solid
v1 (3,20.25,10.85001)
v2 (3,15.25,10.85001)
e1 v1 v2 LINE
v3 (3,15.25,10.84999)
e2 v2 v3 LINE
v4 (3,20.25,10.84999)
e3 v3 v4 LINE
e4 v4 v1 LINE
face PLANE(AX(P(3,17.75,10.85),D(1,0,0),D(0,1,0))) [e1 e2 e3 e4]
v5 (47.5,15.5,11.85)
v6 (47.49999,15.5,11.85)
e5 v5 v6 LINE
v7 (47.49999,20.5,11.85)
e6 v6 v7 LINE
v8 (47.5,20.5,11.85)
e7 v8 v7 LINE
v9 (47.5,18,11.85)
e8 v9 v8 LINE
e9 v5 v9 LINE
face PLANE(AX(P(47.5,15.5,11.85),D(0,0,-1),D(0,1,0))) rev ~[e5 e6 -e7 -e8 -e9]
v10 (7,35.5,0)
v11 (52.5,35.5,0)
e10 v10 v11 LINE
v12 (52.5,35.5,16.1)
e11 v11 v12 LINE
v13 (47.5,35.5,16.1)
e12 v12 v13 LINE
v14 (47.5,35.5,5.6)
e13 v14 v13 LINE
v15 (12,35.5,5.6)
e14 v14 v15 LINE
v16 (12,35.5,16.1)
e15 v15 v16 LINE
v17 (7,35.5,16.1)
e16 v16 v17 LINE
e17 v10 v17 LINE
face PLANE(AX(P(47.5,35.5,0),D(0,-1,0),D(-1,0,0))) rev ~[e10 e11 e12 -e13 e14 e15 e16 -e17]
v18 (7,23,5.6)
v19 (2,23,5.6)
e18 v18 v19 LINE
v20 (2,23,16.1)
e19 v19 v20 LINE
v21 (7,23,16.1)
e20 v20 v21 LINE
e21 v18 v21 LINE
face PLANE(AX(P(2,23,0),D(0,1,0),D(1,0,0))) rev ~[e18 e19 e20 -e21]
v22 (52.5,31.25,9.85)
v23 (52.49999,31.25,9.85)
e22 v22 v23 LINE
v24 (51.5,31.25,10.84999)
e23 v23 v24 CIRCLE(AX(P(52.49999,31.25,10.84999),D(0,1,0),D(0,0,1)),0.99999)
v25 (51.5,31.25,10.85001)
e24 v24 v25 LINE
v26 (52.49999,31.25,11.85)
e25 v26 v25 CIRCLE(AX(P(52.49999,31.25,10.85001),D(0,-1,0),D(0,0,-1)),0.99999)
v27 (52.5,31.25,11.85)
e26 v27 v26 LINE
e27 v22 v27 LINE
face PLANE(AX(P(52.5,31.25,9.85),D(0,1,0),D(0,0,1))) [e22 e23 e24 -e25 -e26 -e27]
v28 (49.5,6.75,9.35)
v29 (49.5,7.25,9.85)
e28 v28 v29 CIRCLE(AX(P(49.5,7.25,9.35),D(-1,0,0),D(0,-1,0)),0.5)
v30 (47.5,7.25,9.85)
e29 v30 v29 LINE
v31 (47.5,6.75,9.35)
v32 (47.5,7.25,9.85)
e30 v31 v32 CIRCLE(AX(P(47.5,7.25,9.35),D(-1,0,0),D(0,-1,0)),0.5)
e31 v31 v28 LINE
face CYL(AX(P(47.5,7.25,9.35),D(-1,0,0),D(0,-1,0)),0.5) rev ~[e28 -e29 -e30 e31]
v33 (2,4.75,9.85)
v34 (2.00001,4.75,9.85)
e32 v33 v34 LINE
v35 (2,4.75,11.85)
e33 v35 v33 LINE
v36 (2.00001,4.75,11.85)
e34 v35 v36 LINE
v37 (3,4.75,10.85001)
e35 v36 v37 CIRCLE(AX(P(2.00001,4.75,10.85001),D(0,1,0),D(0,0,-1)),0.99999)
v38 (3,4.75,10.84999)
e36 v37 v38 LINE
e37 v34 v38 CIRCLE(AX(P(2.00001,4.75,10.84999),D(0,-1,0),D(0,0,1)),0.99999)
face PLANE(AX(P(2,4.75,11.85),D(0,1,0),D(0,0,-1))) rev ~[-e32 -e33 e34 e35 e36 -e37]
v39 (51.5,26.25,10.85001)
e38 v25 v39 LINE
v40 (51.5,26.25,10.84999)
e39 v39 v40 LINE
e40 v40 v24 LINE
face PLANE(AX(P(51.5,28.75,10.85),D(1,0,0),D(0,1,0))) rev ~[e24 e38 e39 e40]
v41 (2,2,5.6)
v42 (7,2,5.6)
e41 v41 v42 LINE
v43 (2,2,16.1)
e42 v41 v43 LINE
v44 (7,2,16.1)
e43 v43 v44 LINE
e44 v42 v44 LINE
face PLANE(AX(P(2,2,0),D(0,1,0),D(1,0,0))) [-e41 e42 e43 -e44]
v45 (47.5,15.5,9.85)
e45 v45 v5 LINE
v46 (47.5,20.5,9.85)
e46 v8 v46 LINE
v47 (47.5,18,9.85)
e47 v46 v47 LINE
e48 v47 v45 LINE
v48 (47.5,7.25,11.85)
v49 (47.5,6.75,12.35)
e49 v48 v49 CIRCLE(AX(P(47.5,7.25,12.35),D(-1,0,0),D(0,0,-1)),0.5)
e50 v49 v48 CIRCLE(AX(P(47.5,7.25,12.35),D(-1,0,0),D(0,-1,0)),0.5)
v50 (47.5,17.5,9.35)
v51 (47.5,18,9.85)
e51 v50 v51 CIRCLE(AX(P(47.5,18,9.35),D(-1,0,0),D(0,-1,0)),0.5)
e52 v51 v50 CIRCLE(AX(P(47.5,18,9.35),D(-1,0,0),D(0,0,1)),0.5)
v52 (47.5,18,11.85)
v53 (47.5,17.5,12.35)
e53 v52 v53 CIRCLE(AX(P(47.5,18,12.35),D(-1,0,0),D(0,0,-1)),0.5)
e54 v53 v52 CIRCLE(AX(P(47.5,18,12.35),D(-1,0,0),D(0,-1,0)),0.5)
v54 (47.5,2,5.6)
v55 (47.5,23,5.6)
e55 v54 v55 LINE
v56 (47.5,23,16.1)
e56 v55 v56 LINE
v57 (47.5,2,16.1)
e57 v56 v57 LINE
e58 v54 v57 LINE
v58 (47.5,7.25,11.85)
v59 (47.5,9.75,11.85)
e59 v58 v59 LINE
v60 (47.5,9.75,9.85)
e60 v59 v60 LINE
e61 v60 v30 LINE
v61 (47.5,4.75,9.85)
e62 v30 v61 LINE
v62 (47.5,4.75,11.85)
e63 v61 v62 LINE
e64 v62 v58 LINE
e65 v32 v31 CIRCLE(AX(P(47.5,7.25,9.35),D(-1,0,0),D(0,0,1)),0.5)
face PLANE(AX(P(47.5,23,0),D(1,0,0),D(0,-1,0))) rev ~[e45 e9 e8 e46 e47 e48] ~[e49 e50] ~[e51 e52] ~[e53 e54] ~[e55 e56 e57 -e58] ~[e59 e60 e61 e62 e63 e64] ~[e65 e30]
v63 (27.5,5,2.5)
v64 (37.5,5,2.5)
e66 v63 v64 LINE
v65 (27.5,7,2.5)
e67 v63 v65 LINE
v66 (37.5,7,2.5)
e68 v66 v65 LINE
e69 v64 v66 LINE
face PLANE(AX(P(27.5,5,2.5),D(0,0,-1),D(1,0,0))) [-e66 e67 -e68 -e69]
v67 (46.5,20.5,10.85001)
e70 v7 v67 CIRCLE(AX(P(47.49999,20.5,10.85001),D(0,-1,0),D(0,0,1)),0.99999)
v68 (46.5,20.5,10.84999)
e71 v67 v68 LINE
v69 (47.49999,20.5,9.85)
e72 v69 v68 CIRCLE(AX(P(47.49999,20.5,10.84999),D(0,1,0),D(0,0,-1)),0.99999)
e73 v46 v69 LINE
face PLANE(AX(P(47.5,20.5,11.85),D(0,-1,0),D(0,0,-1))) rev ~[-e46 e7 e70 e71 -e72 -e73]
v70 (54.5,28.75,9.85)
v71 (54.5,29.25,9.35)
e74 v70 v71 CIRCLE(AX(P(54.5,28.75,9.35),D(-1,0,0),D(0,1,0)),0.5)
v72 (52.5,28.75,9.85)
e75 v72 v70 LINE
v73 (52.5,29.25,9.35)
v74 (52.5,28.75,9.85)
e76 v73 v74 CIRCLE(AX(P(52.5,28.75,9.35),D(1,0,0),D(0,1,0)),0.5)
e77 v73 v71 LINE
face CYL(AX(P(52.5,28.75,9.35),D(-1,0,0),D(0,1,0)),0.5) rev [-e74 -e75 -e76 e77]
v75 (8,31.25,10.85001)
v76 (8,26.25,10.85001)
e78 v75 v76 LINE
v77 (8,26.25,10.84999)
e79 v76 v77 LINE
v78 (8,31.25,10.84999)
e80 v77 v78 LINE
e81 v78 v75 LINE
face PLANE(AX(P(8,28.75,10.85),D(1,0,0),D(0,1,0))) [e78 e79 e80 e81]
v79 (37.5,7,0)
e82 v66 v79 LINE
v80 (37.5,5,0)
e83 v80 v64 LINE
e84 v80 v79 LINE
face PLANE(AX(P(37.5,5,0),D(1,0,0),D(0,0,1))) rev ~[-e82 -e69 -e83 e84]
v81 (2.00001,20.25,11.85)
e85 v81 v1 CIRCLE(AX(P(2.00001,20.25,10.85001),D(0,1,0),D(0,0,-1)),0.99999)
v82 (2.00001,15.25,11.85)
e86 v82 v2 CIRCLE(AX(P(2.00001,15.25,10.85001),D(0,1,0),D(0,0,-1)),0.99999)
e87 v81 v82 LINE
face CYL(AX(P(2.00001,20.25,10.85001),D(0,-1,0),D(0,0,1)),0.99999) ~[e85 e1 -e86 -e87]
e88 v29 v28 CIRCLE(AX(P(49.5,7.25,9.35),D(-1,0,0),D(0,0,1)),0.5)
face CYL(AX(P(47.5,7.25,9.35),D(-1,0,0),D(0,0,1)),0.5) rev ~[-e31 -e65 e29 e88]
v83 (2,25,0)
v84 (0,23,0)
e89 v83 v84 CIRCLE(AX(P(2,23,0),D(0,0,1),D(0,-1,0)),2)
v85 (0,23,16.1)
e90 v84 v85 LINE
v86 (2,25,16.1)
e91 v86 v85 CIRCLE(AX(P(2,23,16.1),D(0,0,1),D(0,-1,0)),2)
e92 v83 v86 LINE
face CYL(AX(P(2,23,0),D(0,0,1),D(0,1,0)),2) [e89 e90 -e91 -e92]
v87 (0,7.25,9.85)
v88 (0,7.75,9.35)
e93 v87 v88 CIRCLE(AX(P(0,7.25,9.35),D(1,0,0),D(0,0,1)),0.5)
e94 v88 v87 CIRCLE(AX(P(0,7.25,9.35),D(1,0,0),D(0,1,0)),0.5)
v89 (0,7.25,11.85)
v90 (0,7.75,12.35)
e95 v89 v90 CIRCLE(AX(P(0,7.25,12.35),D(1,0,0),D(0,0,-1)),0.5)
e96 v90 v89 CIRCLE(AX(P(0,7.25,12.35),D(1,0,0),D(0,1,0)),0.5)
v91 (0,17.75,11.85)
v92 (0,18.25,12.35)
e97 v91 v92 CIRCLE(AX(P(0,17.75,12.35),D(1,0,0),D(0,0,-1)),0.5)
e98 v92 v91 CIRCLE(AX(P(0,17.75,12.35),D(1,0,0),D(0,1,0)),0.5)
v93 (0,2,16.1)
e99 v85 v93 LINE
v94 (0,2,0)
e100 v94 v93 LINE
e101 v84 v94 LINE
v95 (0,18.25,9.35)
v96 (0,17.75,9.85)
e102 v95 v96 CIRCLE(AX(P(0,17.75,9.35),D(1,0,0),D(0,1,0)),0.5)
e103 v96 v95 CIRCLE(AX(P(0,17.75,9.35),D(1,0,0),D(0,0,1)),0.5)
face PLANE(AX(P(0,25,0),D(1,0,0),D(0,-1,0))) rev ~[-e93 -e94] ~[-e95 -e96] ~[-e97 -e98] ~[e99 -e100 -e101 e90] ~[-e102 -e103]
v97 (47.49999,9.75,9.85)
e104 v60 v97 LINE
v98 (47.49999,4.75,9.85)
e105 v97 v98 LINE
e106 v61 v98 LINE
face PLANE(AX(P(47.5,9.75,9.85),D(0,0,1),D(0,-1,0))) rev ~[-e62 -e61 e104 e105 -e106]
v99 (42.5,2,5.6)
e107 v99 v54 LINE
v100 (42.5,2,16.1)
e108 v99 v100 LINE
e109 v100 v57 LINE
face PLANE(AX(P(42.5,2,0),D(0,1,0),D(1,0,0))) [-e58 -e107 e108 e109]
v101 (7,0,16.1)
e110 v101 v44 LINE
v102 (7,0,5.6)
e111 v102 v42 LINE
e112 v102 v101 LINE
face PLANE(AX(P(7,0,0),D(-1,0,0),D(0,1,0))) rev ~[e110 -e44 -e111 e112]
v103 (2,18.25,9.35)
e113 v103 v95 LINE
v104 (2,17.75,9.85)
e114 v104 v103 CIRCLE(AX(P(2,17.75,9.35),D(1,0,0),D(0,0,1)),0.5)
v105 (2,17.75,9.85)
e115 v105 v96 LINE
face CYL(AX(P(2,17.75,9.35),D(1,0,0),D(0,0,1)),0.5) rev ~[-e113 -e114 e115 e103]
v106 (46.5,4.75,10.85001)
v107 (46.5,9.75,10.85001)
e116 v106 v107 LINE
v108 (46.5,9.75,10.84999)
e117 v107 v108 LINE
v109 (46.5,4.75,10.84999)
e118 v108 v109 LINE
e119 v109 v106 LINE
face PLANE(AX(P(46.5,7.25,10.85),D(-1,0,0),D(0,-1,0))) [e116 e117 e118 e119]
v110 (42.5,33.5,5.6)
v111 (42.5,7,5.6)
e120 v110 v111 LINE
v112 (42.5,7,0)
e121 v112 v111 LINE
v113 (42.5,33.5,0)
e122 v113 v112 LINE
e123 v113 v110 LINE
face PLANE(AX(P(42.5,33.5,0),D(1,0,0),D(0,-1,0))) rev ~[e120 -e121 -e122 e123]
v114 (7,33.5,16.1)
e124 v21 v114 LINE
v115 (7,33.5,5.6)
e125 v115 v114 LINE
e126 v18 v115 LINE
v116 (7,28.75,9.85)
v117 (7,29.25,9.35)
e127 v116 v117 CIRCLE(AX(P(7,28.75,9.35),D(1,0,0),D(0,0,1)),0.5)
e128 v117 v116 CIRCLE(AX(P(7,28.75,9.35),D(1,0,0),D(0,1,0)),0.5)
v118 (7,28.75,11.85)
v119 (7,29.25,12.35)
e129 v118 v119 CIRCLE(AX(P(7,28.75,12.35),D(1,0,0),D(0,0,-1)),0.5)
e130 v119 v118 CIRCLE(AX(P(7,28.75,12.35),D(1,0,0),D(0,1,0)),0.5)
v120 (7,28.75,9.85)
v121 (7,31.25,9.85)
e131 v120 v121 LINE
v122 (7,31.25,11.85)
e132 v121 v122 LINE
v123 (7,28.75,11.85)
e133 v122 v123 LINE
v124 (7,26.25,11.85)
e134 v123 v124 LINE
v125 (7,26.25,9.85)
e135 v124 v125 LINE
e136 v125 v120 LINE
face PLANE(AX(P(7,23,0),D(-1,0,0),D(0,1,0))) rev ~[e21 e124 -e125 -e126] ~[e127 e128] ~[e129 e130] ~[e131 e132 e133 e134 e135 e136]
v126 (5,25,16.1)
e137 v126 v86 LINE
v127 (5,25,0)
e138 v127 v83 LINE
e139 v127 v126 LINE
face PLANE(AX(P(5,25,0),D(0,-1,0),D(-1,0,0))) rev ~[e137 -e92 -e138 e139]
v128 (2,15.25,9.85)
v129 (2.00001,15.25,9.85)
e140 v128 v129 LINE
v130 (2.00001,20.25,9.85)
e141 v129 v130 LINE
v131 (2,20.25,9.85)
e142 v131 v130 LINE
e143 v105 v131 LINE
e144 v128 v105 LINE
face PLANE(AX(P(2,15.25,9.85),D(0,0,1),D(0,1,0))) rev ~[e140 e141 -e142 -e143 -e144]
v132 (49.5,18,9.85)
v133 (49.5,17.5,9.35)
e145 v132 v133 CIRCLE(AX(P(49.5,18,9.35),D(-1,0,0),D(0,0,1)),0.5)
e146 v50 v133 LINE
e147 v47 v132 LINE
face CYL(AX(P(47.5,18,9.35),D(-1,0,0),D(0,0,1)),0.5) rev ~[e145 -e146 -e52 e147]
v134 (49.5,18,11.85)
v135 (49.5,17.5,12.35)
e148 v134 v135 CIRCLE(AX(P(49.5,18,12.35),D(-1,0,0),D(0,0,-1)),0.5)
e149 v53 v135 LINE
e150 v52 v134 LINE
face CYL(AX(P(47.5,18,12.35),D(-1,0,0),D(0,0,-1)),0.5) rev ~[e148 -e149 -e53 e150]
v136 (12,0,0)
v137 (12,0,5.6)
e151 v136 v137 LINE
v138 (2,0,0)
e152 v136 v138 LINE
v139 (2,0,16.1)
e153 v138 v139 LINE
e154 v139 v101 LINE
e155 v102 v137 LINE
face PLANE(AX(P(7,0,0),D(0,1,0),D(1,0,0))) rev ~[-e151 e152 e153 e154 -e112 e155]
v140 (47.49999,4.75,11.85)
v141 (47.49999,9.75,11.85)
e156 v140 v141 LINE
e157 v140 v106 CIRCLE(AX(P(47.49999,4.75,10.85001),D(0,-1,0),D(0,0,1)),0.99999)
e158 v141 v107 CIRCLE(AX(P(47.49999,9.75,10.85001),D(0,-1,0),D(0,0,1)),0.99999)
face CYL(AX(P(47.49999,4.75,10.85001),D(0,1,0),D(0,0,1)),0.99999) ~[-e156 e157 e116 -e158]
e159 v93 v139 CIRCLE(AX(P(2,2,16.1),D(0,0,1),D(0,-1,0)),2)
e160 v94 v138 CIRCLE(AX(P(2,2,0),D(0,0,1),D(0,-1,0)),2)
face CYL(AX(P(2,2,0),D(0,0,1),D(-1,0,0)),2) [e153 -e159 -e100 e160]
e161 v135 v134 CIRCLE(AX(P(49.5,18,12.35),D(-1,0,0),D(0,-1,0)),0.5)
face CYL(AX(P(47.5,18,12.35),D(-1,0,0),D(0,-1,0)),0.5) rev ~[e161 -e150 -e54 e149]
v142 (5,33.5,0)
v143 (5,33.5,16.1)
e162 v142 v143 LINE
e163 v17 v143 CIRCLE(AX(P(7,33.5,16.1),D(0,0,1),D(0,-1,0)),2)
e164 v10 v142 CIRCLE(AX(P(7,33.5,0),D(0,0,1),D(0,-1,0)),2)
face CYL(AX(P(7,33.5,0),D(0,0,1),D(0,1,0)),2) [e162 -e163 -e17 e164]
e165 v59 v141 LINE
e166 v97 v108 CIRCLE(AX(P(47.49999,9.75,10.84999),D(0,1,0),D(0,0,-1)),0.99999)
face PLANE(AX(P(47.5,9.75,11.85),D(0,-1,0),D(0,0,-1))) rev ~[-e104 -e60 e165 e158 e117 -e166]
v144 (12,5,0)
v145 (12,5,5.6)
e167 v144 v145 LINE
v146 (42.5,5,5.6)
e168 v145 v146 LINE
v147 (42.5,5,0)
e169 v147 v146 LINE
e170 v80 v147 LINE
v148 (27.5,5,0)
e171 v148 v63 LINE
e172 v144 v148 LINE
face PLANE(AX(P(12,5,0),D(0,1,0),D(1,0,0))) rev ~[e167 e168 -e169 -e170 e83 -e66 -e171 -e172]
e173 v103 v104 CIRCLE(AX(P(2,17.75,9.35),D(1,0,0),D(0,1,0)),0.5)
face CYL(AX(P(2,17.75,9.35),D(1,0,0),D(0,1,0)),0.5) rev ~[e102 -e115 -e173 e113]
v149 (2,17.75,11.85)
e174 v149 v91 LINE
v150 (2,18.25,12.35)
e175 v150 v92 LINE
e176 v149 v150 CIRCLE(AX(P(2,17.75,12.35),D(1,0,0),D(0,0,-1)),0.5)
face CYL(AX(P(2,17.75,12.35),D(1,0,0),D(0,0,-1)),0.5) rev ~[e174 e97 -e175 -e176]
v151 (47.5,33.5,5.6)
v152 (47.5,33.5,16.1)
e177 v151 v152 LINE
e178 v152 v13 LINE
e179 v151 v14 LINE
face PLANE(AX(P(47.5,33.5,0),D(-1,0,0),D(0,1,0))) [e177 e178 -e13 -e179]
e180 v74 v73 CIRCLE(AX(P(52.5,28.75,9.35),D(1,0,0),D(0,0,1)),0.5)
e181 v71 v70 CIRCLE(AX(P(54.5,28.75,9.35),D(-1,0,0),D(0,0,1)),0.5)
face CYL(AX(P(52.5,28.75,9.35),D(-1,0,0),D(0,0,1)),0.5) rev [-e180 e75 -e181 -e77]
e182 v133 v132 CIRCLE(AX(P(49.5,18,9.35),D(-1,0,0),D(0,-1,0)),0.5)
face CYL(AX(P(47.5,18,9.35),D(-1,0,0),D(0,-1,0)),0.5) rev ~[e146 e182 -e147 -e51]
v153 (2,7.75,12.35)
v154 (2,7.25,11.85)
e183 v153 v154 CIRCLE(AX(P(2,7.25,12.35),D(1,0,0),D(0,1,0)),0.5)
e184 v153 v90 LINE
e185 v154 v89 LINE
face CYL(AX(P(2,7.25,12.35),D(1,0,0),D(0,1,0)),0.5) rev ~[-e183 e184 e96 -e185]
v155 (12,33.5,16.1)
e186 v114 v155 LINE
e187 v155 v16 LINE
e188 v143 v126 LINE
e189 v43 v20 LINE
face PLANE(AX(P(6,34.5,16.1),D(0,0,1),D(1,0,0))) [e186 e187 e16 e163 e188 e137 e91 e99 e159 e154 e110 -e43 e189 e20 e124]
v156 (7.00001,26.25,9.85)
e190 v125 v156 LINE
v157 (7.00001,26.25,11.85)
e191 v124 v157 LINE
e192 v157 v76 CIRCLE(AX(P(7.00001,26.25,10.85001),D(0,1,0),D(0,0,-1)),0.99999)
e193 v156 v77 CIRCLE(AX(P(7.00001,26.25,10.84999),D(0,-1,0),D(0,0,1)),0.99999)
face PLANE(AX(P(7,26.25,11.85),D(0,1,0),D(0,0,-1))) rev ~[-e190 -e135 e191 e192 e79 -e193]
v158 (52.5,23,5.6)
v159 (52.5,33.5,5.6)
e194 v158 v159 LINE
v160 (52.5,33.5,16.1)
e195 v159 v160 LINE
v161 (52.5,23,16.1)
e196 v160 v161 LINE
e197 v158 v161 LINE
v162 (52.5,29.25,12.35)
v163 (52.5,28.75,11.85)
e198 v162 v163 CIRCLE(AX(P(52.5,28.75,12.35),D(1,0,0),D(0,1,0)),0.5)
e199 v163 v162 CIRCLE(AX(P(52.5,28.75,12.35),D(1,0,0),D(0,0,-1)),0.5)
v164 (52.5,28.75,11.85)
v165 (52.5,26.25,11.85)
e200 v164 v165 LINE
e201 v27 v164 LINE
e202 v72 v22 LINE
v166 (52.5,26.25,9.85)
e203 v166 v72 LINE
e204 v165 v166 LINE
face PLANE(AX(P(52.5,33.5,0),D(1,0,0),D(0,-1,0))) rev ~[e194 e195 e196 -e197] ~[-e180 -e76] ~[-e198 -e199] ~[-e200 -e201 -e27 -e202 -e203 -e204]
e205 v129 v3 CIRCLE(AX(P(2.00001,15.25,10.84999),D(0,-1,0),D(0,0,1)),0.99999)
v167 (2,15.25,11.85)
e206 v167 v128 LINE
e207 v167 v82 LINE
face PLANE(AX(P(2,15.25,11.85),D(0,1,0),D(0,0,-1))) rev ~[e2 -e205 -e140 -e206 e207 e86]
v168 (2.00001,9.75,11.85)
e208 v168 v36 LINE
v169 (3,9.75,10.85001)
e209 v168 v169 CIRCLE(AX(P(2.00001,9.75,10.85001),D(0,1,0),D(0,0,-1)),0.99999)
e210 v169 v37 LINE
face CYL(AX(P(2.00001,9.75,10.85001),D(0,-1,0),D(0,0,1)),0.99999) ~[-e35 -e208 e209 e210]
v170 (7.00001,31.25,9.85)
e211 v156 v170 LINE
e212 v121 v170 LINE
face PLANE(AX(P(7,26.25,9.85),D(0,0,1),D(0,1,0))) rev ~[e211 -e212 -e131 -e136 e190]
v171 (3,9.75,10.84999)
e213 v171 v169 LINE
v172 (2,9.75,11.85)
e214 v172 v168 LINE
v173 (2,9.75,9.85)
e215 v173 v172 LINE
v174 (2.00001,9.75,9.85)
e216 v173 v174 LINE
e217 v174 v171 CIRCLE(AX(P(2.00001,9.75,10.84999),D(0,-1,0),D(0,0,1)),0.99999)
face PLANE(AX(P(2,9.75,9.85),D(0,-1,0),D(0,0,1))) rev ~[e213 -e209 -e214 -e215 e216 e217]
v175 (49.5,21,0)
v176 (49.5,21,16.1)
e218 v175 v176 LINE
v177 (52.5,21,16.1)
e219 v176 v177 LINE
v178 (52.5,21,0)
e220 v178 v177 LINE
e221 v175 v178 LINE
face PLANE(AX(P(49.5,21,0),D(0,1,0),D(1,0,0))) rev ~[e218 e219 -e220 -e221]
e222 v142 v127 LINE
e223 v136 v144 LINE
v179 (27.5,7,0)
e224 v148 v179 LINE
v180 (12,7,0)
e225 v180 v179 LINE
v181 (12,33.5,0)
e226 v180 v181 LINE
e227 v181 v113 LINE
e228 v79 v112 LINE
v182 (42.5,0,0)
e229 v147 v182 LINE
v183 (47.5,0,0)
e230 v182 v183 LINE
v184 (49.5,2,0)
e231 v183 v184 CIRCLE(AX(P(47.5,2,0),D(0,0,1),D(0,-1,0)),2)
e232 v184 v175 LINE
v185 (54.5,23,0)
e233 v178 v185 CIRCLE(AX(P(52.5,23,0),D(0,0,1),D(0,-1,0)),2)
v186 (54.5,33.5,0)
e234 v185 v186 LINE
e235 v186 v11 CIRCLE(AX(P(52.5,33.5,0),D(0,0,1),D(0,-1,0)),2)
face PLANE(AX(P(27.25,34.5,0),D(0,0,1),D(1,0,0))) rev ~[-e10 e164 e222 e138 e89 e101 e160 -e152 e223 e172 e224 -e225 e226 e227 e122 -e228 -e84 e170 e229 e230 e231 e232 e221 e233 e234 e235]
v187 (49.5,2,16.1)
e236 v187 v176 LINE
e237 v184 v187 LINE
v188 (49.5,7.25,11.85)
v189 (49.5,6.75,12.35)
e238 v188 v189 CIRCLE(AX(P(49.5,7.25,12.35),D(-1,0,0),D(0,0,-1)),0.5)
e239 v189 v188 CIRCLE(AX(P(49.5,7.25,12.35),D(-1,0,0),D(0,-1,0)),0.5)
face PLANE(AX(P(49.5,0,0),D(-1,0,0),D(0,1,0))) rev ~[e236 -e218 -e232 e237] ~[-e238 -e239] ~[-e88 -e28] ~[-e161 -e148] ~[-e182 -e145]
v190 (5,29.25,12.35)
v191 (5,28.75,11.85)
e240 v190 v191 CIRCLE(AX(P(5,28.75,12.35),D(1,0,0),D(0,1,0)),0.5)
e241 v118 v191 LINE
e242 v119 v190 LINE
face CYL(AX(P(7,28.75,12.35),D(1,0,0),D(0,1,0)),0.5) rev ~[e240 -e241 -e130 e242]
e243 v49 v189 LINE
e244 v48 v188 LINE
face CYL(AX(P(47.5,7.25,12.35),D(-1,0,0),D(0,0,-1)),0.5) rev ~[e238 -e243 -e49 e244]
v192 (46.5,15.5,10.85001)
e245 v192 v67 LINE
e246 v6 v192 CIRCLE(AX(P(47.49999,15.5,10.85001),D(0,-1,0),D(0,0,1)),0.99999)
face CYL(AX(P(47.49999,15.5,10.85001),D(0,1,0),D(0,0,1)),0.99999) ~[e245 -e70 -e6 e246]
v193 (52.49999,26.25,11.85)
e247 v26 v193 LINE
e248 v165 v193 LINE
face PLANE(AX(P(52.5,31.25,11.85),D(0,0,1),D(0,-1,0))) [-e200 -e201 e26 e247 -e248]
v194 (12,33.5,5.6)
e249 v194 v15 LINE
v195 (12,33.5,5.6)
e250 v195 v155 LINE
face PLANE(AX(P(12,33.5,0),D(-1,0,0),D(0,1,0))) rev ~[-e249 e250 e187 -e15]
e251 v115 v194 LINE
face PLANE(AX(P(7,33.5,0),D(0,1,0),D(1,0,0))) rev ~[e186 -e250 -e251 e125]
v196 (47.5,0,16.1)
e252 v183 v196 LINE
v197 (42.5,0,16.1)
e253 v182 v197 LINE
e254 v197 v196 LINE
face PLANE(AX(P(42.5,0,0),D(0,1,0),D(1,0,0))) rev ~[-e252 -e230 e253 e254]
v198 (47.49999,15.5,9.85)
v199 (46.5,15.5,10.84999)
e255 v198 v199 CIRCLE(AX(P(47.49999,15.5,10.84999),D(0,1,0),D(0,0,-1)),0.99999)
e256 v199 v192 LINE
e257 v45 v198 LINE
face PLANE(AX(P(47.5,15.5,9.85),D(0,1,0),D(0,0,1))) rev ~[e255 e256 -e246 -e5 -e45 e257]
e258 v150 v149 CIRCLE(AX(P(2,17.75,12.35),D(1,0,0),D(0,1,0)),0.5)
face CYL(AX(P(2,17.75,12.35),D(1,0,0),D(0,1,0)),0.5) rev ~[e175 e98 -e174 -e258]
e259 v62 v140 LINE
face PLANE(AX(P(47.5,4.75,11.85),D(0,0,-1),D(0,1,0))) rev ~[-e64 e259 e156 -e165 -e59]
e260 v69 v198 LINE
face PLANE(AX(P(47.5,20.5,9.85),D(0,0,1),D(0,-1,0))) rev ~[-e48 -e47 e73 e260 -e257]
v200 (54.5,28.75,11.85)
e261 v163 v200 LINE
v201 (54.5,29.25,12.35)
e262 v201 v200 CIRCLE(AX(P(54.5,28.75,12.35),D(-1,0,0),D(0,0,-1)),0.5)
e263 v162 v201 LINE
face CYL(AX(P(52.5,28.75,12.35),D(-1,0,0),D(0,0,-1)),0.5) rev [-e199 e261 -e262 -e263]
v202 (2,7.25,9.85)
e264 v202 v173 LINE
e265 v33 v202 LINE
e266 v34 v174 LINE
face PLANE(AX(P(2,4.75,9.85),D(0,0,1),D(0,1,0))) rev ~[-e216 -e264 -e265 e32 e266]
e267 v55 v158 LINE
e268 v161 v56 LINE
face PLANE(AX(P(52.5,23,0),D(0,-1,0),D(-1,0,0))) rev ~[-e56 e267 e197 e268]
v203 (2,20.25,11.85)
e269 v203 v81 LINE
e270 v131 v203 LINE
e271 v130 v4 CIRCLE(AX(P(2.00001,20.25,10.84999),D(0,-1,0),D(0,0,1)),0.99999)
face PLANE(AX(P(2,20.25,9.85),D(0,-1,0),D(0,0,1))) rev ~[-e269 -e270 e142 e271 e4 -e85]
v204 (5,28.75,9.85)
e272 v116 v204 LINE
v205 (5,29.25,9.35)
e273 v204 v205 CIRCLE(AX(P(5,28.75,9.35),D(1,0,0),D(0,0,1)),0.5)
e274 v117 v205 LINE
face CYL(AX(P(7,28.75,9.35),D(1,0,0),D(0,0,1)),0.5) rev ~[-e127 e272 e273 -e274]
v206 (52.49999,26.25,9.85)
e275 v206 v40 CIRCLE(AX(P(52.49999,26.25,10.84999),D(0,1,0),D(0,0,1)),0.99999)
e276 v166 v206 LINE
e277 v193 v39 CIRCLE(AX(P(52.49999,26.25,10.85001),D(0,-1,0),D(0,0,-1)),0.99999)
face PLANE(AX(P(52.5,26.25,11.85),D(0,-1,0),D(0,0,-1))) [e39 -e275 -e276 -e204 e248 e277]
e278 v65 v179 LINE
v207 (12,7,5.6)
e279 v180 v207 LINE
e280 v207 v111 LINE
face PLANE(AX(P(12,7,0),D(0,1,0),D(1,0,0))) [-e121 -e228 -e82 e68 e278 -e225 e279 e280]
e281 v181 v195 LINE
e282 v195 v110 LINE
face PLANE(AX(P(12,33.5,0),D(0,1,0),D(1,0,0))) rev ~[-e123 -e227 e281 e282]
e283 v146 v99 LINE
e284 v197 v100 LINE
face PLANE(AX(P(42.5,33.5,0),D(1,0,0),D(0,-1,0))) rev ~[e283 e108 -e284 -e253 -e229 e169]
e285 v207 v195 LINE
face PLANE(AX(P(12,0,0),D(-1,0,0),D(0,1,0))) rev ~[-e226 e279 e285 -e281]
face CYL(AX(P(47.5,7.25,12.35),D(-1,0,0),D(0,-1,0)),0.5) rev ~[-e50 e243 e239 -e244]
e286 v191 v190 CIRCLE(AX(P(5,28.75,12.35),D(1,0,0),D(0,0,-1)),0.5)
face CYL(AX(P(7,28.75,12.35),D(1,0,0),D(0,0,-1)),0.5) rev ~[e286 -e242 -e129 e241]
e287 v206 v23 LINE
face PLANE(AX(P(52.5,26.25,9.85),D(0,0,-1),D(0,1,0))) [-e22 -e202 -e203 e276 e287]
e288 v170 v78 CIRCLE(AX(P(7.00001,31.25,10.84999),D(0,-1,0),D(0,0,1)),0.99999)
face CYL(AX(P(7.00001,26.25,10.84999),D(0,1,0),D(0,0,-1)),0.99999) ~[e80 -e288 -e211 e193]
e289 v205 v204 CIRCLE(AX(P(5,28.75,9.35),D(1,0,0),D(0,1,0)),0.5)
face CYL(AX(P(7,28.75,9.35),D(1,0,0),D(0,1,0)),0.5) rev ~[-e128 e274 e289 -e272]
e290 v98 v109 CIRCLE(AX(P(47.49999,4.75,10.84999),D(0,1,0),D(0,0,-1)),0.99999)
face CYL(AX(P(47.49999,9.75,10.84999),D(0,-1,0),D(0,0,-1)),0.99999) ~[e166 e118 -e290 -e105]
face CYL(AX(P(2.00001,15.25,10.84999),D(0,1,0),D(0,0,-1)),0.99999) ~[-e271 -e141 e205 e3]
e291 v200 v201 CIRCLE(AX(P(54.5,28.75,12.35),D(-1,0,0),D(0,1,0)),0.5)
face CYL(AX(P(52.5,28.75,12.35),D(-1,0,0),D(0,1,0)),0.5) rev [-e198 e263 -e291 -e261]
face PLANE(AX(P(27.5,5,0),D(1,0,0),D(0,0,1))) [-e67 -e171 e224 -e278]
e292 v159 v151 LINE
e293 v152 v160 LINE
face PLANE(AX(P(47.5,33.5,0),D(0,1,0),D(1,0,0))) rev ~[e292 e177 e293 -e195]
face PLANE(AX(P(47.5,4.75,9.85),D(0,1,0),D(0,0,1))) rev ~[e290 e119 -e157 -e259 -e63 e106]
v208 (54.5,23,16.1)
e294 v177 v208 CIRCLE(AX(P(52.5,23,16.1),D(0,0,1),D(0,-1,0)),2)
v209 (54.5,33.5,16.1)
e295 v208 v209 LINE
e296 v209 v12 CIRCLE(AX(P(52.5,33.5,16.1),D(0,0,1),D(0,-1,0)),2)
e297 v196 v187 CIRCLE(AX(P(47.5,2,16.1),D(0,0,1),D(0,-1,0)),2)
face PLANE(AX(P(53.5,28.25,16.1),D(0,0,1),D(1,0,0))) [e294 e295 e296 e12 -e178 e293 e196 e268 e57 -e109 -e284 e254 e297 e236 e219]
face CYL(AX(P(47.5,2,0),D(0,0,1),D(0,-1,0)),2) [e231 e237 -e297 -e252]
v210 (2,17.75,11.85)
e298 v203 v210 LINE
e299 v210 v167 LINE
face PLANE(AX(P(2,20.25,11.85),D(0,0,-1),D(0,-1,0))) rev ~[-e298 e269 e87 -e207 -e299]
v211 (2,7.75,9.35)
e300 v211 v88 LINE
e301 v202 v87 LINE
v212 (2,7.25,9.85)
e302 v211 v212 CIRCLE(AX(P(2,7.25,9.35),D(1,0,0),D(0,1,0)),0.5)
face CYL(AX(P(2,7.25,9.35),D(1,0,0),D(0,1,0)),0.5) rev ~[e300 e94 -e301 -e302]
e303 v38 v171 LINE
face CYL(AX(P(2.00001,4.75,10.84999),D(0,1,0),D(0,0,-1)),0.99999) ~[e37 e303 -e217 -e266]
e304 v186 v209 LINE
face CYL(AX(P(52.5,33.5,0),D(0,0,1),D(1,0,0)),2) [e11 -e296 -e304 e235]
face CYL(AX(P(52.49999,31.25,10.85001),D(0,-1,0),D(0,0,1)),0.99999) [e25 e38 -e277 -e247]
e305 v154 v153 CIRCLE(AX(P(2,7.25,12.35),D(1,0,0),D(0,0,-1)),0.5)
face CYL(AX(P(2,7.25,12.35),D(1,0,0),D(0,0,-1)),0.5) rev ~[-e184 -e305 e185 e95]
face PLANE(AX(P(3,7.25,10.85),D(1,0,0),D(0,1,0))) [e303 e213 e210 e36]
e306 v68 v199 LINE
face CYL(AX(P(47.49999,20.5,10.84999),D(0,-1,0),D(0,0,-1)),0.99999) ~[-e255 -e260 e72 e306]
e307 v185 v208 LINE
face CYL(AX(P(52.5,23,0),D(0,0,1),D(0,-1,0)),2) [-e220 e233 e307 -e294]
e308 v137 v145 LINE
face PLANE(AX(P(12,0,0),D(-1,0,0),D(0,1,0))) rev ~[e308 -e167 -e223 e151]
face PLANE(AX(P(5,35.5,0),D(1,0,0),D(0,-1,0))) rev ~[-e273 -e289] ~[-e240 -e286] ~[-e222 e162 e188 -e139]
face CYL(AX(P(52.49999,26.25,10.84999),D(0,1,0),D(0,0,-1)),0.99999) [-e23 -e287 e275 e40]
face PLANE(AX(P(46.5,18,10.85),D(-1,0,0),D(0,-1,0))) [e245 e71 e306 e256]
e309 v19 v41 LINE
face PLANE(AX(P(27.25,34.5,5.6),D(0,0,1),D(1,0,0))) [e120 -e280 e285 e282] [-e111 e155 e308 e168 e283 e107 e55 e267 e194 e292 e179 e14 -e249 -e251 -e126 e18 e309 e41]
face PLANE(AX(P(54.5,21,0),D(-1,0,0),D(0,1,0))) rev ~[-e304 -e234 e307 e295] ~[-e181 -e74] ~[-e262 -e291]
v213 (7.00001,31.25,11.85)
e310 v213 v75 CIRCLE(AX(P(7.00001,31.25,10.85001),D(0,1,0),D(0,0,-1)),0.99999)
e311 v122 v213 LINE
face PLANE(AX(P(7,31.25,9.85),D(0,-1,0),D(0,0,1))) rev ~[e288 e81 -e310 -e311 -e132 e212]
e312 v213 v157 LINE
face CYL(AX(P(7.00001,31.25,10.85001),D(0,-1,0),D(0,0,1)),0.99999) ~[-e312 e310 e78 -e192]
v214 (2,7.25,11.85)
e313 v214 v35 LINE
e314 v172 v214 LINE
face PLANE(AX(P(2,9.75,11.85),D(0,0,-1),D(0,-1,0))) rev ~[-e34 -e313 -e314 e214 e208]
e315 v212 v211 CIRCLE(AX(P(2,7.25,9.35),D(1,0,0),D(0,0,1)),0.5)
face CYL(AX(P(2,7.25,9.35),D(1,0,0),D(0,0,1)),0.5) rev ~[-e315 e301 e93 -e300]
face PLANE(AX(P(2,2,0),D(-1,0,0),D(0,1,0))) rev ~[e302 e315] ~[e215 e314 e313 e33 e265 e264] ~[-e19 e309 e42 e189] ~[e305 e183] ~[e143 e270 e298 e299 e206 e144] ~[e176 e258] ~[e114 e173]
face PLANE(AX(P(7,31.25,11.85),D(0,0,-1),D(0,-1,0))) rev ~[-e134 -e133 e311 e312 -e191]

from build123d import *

# Parameters (mm, degrees)
F0_W      = 2
F0_H      = 10.5
F0_H_2    = 2
F0_W_2    = 5
F1_DEPTH  = 16.1
F0_H_3    = 21
F0_W_3    = 30.5
F2_DEPTH  = 5.6
F3_DEPTH  = 5.6
F4_R      = 2
F22_DEPTH = 1
F23_DEPTH = 25
F24_DEPTH = 1
F25_DEPTH = 25
F26_R     = 0.99999
F27_W     = 10
F27_H     = 2.5
F28_DEPTH = 15


# Not quite as in the source:
# - a fillet or chamfer is up to 0.001 mm smaller than in the source, because OpenCascade refuses the exact size


with BuildPart() as f1:
    # F0 (on Top) → F1 (new body)
    with BuildSketch(Plane.XY):
        with Locations((53.5, 28.25)):
            Rectangle(F0_W, F0_H)
        with Locations((53.5, 34.5)):
            Rectangle(F0_W, F0_H_2)
        Polygon((52.5, 23), (49.5, 23), (49.5, 21), (54.5, 21), (54.5, 23), align=None)
        Polygon((47.5, 23), (47.5, 2), (49.5, 2), (49.5, 21), (49.5, 23), align=None)
        with Locations((48.5, 1)):
            Rectangle(F0_W, F0_H_2)
        with Locations((45, 1)):
            Rectangle(F0_W_2, F0_H_2)
        with Locations((50, 34.5)):
            Rectangle(F0_W_2, F0_H_2)
    extrude(amount=F1_DEPTH)



with BuildPart() as f1b:
    # F0 (on Top) → F1, piece 2 (new body)
    with BuildSketch(Plane.XY):
        with Locations((6, 34.5)):
            Rectangle(F0_W, F0_H_2)
        Polygon((5, 25), (5, 23), (7, 23), (7, 33.5), (5, 33.5), align=None)
        Polygon((0, 25), (0, 23), (2, 23), (5, 23), (5, 25), align=None)
        with Locations((1, 12.5)):
            Rectangle(F0_W, F0_H_3)
        with Locations((1, 1)):
            Rectangle(F0_W, F0_H_2)
        with Locations((4.5, 1)):
            Rectangle(F0_W_2, F0_H_2)
        with Locations((9.5, 34.5)):
            Rectangle(F0_W_2, F0_H_2)
    extrude(amount=F1_DEPTH)


with BuildPart() as f1_1:
    add(f1.part)

    add(f1b.part)  # F2 merges F1b
    # F0 (on Top) → F2 (join)
    with BuildSketch(Plane.XY):
        with Locations((27.25, 34.5)):
            Rectangle(F0_W_3, F0_H_2)
        with Locations((45, 34.5)):
            Rectangle(F0_W_2, F0_H_2)
        with Locations((9.5, 1)):
            Rectangle(F0_W_2, F0_H_2)
        Polygon((2, 23), (2, 2), (7, 2), (7, 23), (5, 23), align=None)
        Polygon((7, 23), (7, 2), (12, 2), (12, 5), (12, 7), (12, 23), align=None)
        with Locations((9.5, 28.25)):
            Rectangle(F0_W_2, F0_H)
        Polygon((42.5, 33.5), (42.5, 23), (47.5, 23), (49.5, 23), (52.5, 23), (52.5, 33.5), (47.5, 33.5), align=None)
        Polygon((42.5, 5), (42.5, 2), (47.5, 2), (47.5, 23), (42.5, 23), (42.5, 7), align=None)
    extrude(amount=F2_DEPTH)

    # F0 (on Top) → F3 (join)
    with BuildSketch(Plane.XY):
        with Locations((27.25, 6)):
            Rectangle(F0_W_3, F0_H_2)
    extrude(amount=F3_DEPTH)

    # F4
    f4_edges = [f1_1.edges().sort_by_distance(p)[0] for p in [
        (0, 0, 8.05),
        (0, 25, 8.05),
        (5, 35.5, 8.05),
        (54.5, 35.5, 8.05),
        (54.5, 21, 8.05),
        (49.5, 0, 8.05),
    ]]
    fillet(f4_edges, radius=F4_R)

    # F18 (on 3pt) + F19 (on 3pt) → F22 (join)
    with BuildSketch(Plane.YZ.offset(2)):
        Polygon((4.75, 11.85), (4.75, 9.85), (7.25, 9.85), (9.75, 9.85), (9.75, 11.85), (7.25, 11.85), align=None)
        Polygon((15.25, 11.85), (15.25, 9.85), (17.75, 9.85), (20.25, 9.85), (20.25, 11.85), (17.75, 11.85), align=None)
    with BuildSketch(Plane.YZ.offset(7)):
        Polygon((26.25, 11.85), (26.25, 9.85), (28.75, 9.85), (31.25, 9.85), (31.25, 11.85), (28.75, 11.85), align=None)
    extrude(amount=F22_DEPTH)

    # F18 (on 3pt) + F19 (on 3pt) → F23 (cut)
    with BuildSketch(Plane.YZ.offset(2)):
        with BuildLine():
            ThreePointArc((18.25, 12.35), (17.3964466094, 12.7035533906), (17.75, 11.85))
            ThreePointArc((17.75, 11.85), (18.1035533906, 11.9964466094), (18.25, 12.35))
        make_face()
        with BuildLine():
            ThreePointArc((18.25, 9.35), (18.1035533906, 9.7035533906), (17.75, 9.85))
            ThreePointArc((17.75, 9.85), (17.3964466094, 8.9964466094), (18.25, 9.35))
        make_face()
        with BuildLine():
            ThreePointArc((7.75, 9.35), (7.6035533906, 9.7035533906), (7.25, 9.85))
            ThreePointArc((7.25, 9.85), (6.8964466094, 8.9964466094), (7.75, 9.35))
        make_face()
        with BuildLine():
            ThreePointArc((7.75, 12.35), (6.8964466094, 12.7035533906), (7.25, 11.85))
            ThreePointArc((7.25, 11.85), (7.6035533906, 11.9964466094), (7.75, 12.35))
        make_face()
    with BuildSketch(Plane.YZ.offset(7)):
        with BuildLine():
            ThreePointArc((29.25, 12.35), (28.3964466094, 12.7035533906), (28.75, 11.85))
            ThreePointArc((28.75, 11.85), (29.1035533906, 11.9964466094), (29.25, 12.35))
        make_face()
        with BuildLine():
            ThreePointArc((29.25, 9.35), (29.1035533906, 9.7035533906), (28.75, 9.85))
            ThreePointArc((28.75, 9.85), (28.3964466094, 8.9964466094), (29.25, 9.35))
        make_face()
    extrude(amount=-F23_DEPTH, mode=Mode.SUBTRACT)

    # F20 (on 3pt) + F21 (on 3pt) → F24 (join)
    with BuildSketch(Plane(origin=(47.5, 0, 0), x_dir=(0, -1, 0), z_dir=(-1, 0, 0))):
        Polygon((-20.5, 11.85), (-20.5, 9.85), (-18, 9.85), (-15.5, 9.85), (-15.5, 11.85), (-18, 11.85), align=None)
        Polygon((-9.75, 11.85), (-9.75, 9.85), (-7.25, 9.85), (-4.75, 9.85), (-4.75, 11.85), (-7.25, 11.85), align=None)
    with BuildSketch(Plane.YZ.offset(52.5)):
        Polygon((26.25, 11.85), (26.25, 9.85), (28.75, 9.85), (31.25, 9.85), (31.25, 11.85), (28.75, 11.85), align=None)
    extrude(amount=F24_DEPTH, dir=(-1, 0, 0))

    # F21 (on 3pt) + F20 (on 3pt) → F25 (cut)
    with BuildSketch(Plane.YZ.offset(52.5)):
        with BuildLine():
            ThreePointArc((29.25, 12.35), (28.3964466094, 12.7035533906), (28.75, 11.85))
            ThreePointArc((28.75, 11.85), (29.1035533906, 11.9964466094), (29.25, 12.35))
        make_face()
        with BuildLine():
            ThreePointArc((29.25, 9.35), (29.1035533906, 9.7035533906), (28.75, 9.85))
            ThreePointArc((28.75, 9.85), (28.3964466094, 8.9964466094), (29.25, 9.35))
        make_face()
    with BuildSketch(Plane(origin=(47.5, 0, 0), x_dir=(0, -1, 0), z_dir=(-1, 0, 0))):
        with BuildLine():
            ThreePointArc((-17.5, 12.35), (-18.3535533906, 12.7035533906), (-18, 11.85))
            ThreePointArc((-18, 11.85), (-17.6464466094, 11.9964466094), (-17.5, 12.35))
        make_face()
        with BuildLine():
            ThreePointArc((-17.5, 9.35), (-17.6464466094, 9.7035533906), (-18, 9.85))
            ThreePointArc((-18, 9.85), (-18.3535533906, 8.9964466094), (-17.5, 9.35))
        make_face()
        with BuildLine():
            ThreePointArc((-6.75, 12.35), (-7.6035533906, 12.7035533906), (-7.25, 11.85))
            ThreePointArc((-7.25, 11.85), (-6.8964466094, 11.9964466094), (-6.75, 12.35))
        make_face()
        with BuildLine():
            ThreePointArc((-6.75, 9.35), (-6.8964466094, 9.7035533906), (-7.25, 9.85))
            ThreePointArc((-7.25, 9.85), (-7.6035533906, 8.9964466094), (-6.75, 9.35))
        make_face()
    extrude(amount=F25_DEPTH, dir=(1, 0, 0), mode=Mode.SUBTRACT)

    # F26 (radius 1 in the source; OpenCascade refuses exactly that, so slightly less here)
    f26_edges = [f1_1.edges().sort_by_distance(p)[0] for p in [
        (3, 7.25, 11.85),
        (3, 7.25, 9.85),
        (3, 17.75, 11.85),
        (3, 17.75, 9.85),
        (8, 28.75, 11.85),
        (8, 28.75, 9.85),
        (46.5, 18, 9.85),
        (46.5, 7.25, 9.85),
        (46.5, 7.25, 11.85),
        (46.5, 18, 11.85),
        (51.5, 28.75, 11.85),
        (51.5, 28.75, 9.85),
    ]]
    fillet(f26_edges, radius=F26_R)

    # F27 (on face) → F28 (cut)
    with BuildSketch(Plane.XZ.offset(-5)):
        with Locations((32.5, 1.25)):
            Rectangle(F27_W, F27_H)
    extrude(amount=-F28_DEPTH, mode=Mode.SUBTRACT)


solid = f1_1.part
